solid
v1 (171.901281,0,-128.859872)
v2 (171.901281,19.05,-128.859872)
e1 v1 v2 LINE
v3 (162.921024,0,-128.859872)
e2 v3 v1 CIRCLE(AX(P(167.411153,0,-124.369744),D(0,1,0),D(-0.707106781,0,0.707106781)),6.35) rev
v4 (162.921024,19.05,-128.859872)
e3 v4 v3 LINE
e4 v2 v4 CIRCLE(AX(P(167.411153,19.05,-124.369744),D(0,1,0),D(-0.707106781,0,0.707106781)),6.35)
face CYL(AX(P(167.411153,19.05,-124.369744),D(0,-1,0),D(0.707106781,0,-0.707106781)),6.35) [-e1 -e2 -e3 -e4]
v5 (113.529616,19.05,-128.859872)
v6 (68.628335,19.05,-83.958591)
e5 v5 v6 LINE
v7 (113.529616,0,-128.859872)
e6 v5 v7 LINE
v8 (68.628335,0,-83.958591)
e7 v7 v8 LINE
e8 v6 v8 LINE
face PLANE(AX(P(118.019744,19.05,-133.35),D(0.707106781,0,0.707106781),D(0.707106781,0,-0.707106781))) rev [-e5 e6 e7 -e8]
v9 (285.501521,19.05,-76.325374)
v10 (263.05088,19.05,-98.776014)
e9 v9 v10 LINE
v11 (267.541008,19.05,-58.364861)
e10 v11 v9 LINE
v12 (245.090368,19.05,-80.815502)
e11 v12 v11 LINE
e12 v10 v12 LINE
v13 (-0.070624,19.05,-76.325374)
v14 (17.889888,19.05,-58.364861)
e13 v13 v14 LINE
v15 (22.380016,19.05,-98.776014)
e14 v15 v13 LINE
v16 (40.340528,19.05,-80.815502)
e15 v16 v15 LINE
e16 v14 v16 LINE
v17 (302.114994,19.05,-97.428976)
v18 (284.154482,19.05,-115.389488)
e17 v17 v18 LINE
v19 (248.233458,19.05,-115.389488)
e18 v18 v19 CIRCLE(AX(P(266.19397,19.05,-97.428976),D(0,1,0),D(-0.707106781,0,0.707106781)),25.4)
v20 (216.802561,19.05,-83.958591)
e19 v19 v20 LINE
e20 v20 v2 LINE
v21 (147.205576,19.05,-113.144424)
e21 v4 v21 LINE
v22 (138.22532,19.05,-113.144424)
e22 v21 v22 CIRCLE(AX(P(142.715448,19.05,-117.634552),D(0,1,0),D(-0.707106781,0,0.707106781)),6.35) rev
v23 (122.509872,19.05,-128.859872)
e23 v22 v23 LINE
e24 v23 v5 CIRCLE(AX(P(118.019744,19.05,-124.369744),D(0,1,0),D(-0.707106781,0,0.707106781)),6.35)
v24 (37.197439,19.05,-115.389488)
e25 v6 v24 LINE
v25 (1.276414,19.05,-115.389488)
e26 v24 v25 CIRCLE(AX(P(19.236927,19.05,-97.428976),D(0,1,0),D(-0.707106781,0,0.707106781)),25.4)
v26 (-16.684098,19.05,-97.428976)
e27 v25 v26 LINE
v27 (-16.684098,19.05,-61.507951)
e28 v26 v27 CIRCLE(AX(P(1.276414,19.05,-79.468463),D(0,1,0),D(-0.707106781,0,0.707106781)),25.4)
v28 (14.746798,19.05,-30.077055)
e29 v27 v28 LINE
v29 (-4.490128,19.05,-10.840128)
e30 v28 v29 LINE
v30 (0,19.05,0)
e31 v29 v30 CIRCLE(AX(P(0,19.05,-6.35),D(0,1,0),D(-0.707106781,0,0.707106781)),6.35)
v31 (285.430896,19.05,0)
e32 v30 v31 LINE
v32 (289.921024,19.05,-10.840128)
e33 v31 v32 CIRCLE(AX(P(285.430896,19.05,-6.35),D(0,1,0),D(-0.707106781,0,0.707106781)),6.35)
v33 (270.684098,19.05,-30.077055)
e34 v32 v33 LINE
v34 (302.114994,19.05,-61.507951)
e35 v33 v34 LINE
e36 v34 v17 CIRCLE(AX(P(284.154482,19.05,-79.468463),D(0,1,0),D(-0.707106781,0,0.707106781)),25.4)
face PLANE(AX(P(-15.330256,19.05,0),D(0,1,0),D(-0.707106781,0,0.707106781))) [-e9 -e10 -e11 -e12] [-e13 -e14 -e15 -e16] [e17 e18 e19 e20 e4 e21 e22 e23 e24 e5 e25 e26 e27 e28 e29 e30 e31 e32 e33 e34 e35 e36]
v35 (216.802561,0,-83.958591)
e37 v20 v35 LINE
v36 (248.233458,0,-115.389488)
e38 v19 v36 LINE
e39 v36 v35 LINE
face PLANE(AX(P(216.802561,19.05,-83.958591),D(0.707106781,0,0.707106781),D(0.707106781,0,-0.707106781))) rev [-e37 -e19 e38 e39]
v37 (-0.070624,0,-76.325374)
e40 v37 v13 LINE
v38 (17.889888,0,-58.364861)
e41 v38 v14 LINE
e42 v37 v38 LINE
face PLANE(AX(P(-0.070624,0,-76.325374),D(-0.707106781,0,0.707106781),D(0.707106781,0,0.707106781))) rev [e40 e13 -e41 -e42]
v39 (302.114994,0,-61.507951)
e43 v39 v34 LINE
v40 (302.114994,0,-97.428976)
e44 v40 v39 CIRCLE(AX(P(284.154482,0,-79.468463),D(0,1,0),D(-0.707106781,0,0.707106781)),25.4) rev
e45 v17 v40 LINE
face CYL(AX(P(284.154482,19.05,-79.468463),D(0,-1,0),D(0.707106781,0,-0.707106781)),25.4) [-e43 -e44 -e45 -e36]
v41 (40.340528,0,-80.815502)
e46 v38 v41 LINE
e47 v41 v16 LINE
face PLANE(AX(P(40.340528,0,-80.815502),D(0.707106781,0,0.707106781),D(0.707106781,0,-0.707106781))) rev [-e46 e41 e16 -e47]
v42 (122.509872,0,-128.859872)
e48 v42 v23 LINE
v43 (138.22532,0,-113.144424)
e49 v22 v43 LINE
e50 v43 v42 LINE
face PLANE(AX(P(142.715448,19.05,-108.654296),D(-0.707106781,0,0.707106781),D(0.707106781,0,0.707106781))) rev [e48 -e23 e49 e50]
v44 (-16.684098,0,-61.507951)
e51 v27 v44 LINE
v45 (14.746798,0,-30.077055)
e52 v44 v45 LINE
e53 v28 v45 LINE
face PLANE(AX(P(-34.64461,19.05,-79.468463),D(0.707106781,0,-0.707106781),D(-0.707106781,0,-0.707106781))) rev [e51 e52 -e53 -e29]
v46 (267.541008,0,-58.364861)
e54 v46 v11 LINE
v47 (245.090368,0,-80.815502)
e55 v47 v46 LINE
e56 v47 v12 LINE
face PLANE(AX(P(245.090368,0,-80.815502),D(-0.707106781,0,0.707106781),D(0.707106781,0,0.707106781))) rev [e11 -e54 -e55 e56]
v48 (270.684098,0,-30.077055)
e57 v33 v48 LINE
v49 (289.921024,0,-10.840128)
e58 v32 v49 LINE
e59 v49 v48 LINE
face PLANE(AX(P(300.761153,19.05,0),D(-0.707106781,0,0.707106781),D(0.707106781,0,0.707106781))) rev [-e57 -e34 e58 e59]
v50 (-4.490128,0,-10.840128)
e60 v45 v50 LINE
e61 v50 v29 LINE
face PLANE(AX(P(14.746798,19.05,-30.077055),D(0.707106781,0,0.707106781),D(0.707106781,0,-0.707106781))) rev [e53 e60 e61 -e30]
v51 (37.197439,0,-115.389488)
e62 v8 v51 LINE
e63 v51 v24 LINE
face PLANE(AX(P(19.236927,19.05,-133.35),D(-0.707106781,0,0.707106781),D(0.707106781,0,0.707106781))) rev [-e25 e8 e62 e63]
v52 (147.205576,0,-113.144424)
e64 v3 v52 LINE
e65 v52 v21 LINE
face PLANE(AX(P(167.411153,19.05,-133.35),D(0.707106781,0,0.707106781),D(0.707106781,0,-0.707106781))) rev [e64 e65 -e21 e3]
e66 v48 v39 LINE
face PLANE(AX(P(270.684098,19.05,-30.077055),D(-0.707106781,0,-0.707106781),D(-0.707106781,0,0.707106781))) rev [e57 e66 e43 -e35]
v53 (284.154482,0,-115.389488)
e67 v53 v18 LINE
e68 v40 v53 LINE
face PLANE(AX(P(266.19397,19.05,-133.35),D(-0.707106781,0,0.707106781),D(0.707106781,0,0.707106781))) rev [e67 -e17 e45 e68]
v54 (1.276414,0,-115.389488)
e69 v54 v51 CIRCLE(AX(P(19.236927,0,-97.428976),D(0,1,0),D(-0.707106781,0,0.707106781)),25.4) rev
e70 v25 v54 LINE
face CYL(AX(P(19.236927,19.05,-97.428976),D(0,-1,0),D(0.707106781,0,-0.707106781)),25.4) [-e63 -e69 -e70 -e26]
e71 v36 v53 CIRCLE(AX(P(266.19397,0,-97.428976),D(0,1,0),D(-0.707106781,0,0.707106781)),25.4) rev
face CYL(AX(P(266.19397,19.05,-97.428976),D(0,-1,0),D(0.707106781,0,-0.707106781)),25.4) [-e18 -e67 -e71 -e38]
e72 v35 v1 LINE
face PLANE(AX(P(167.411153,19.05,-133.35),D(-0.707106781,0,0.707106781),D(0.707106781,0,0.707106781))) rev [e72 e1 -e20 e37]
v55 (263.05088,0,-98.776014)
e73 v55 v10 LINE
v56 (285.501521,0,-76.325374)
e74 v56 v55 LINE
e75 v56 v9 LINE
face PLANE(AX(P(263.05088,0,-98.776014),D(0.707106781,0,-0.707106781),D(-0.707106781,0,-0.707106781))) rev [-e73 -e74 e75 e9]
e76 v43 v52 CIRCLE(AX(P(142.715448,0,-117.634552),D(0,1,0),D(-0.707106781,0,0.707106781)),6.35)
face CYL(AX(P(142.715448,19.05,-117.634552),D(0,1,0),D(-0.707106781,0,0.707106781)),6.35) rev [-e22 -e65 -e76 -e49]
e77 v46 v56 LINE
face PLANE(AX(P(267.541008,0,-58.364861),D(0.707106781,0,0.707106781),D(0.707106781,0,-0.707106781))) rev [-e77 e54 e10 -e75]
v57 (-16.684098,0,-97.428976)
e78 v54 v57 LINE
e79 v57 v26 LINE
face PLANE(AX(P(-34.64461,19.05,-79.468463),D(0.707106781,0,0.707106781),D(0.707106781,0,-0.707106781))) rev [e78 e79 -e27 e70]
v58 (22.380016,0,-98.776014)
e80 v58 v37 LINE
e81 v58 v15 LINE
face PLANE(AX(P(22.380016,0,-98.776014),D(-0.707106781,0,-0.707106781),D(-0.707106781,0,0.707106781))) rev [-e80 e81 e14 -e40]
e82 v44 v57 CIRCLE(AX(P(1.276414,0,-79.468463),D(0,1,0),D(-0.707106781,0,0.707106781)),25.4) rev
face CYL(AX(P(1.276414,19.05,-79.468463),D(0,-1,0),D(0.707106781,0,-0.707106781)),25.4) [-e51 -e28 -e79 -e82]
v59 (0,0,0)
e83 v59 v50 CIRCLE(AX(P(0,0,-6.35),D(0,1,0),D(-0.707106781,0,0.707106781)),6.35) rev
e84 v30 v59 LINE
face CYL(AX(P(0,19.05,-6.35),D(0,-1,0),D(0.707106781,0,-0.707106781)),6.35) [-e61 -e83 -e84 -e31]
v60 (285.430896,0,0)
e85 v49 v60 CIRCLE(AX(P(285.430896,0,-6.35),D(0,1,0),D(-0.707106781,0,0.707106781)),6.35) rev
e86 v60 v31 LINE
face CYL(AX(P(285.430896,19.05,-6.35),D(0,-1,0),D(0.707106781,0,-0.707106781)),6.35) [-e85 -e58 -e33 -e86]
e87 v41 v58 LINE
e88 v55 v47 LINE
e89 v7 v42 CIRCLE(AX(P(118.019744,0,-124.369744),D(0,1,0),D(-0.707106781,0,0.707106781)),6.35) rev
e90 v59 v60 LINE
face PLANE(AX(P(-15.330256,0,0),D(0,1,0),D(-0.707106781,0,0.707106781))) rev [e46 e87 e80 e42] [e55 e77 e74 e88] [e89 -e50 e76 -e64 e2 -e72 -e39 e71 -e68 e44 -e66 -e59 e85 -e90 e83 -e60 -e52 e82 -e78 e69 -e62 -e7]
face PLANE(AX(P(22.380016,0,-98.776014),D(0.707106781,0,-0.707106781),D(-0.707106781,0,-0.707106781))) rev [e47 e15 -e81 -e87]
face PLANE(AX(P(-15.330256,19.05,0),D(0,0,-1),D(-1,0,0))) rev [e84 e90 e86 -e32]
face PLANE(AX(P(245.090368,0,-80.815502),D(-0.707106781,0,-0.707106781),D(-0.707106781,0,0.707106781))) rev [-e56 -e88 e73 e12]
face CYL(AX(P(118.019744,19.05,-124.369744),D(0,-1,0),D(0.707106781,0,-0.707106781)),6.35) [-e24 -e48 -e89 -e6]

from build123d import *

# Parameters (mm, degrees)
BOSS_EXTRUDE1_DEPTH       = 19.05
SKETCH2_W                 = 25.4
SKETCH2_H                 = 31.75
SKETCH2_W_2               = 31.75
SKETCH2_H_2               = 25.4
CUT_EXTRUDE1_DEPTH        = 19.05
FILLET1_R                 = 25.4
FILLET2_R                 = 6.35
BODY_MOVE_COPY1_OUTLINE_W = 31.75
BODY_MOVE_COPY1_OUTLINE_H = 25.4
BODY_MOVE_COPY1_DEPTH     = 19.05
BODY_MOVE_COPY1_2_DEPTH   = 19.05


# Read off the part's stored shape, not the designer's step: Body-Move/Copy1
with BuildPart() as part:
    # Sketch1 → Boss-Extrude1 (new body)
    with BuildSketch(Plane(origin=(0, 0, 0), x_dir=(1, 0, 0), z_dir=(0, 1, 0))):
        Polygon((104.775, 223.510378542), (104.775, 293.360378542), (180.975, 293.360378542), (180.975, 223.510378542), (223.510378542, 223.510378542), (0, 0), (0, 42.535378542), (-69.85, 42.535378542), (-69.85, 118.735378542), (0, 118.735378542), (0, 188.585378542), (34.925, 188.585378542), (34.925, 223.510378542), align=None)
    extrude(amount=BOSS_EXTRUDE1_DEPTH)

    # Sketch2 → Cut-Extrude1 (cut)
    with BuildSketch(Plane(origin=(0, 19.05, 0), x_dir=(1, 0, 0), z_dir=(0, 1, 0))):
        with Locations((-30.48, 80.635378542)):
            Rectangle(SKETCH2_W, SKETCH2_H)
        with Locations((142.875, 253.990378542)):
            Rectangle(SKETCH2_W_2, SKETCH2_H_2)
    extrude(amount=-CUT_EXTRUDE1_DEPTH, mode=Mode.SUBTRACT)

    # Fillet1
    fillet1_edges = [part.edges().sort_by_distance(p)[0] for p in [
        (104.775, 9.525, -293.360378542),
        (180.975, 9.525, -293.360378542),
        (-69.85, 9.525, -42.535378542),
        (-69.85, 9.525, -118.735378542),
    ]]
    fillet(fillet1_edges, radius=FILLET1_R)

    # Fillet2
    fillet2_edges = [part.edges().sort_by_distance(p)[0] for p in [
        (223.510378542, 9.525, -223.510378542),
        (0, 9.525, 0),
        (0, 9.525, -188.585378542),
        (34.925, 9.525, -188.585378542),
        (34.925, 9.525, -223.510378542),
    ]]
    fillet(fillet2_edges, radius=FILLET2_R)

    # Body-Move/Copy1 outline → Body-Move/Copy1 (cut)
    # profile 1 of 2: a face of its own
    with BuildSketch(Plane(origin=(0, 0, 0), x_dir=(1, 0, 0), z_dir=(0, 1, 0))):
        with BuildLine():
            Line((122.509871939, 128.859871939), (125.684871939, 125.684871939))
            Line((125.684871939, 125.684871939), (212.670250482, 212.670250482))
            ThreePointArc((212.670250482, 212.670250482), (214.046757453, 219.590418338), (208.180122421, 223.510378542))
            Line((208.180122421, 223.510378542), (180.975, 223.510378542))
            Line((180.975, 223.510378542), (180.975, 267.960378542))
            ThreePointArc((180.975, 267.960378542), (173.535512243, 285.920890784), (155.575, 293.360378542))
            Line((155.575, 293.360378542), (130.175, 293.360378542))
            ThreePointArc((130.175, 293.360378542), (112.214487758, 285.920890784), (104.775, 267.960378542))
            Line((104.775, 267.960378542), (104.775, 223.510378542))
            Line((104.775, 223.510378542), (41.275, 223.510378542))
            ThreePointArc((41.275, 223.510378542), (36.784871939, 221.650506603), (34.925, 217.160378542))
            Line((34.925, 217.160378542), (34.925, 194.935378542))
            ThreePointArc((34.925, 194.935378542), (33.06512806, 190.445250481), (28.575, 188.585378542))
            Line((28.575, 188.585378542), (6.35, 188.585378542))
            ThreePointArc((6.35, 188.585378542), (1.859871939, 186.725506603), (0, 182.235378542))
            Line((0, 182.235378542), (0, 118.735378542))
            Line((0, 118.735378542), (-44.45, 118.735378542))
            ThreePointArc((-44.45, 118.735378542), (-62.410512242, 111.295890785), (-69.85, 93.335378542))
            Line((-69.85, 93.335378542), (-69.85, 67.935378542))
            ThreePointArc((-69.85, 67.935378542), (-62.410512242, 49.9748663), (-44.45, 42.535378542))
            Line((-44.45, 42.535378542), (0, 42.535378542))
            Line((0, 42.535378542), (0, 15.330256121))
            Line((0, 15.330256121), (14.746798487, 30.077054608))
            Line((14.746798487, 30.077054608), (-16.684097937, 61.507951031))
            ThreePointArc((-16.684097937, 61.507951031), (-18.126244186, 63.076488301), (-19.431850797, 64.760378542))
            Line((-19.431850797, 64.760378542), (-43.18, 64.760378542))
            Line((-43.18, 64.760378542), (-43.18, 96.510378542))
            Line((-43.18, 96.510378542), (-17.78, 96.510378542))
            Line((-17.78, 96.510378542), (-17.78, 96.261708161))
            ThreePointArc((-17.78, 96.261708161), (-17.241248642, 96.853979055), (-16.684097937, 97.428975516))
            Line((-16.684097937, 97.428975516), (1.276414305, 115.389487758))
            ThreePointArc((1.276414305, 115.389487758), (19.236926547, 122.828975516), (37.197438789, 115.389487758))
            Line((37.197438789, 115.389487758), (68.628335213, 83.958591334))
            Line((68.628335213, 83.958591334), (113.529615818, 128.859871939))
            ThreePointArc((113.529615818, 128.859871939), (118.019743879, 130.719743879), (122.509871939, 128.859871939))
        make_face()
        with Locations((142.875, 253.990378542)):
            Rectangle(BODY_MOVE_COPY1_OUTLINE_W, BODY_MOVE_COPY1_OUTLINE_H, mode=Mode.SUBTRACT)
    # profile 2 of 2: a face of its own
    with BuildSketch(Plane(origin=(0, 0, 0), x_dir=(1, 0, 0), z_dir=(0, 1, 0))):
        Polygon((40.340528432, 80.815501692), (22.38001619, 98.776013934), (-0.070624113, 76.325373631), (17.889888129, 58.364861389), align=None)
    extrude(amount=BODY_MOVE_COPY1_DEPTH, mode=Mode.SUBTRACT)

    # Body-Move_Copy1 2 outline → Body-Move_Copy1 2 (add)
    # profile 1 of 2: a face of its own
    with BuildSketch(Plane(origin=(0, 0, 0), x_dir=(1, 0, 0), z_dir=(0, 1, 0))):
        with BuildLine():
            Line((216.802561211, 83.958591334), (171.901280605, 128.859871939))
            ThreePointArc((171.901280605, 128.859871939), (167.411152544, 130.719743879), (162.921024484, 128.859871939))
            Line((162.921024484, 128.859871939), (147.205576272, 113.144423728))
            ThreePointArc((147.205576272, 113.144423728), (142.715448211, 111.284551788), (138.225320151, 113.144423728))
            Line((138.225320151, 113.144423728), (125.684871939, 125.684871939))
            Line((125.684871939, 125.684871939), (10.840128061, 10.840128061))
            ThreePointArc((10.840128061, 10.840128061), (3.919960205, 9.46362109), (0, 15.330256121))
            Line((0, 15.330256121), (-4.490128061, 10.840128061))
            ThreePointArc((-4.490128061, 10.840128061), (-5.866635031, 3.919960205), (0, 0))
            Line((0, 0), (285.430896424, 0))
            ThreePointArc((285.430896424, 0), (291.297531455, 3.919960205), (289.921024484, 10.840128061))
            Line((289.921024484, 10.840128061), (270.684097937, 30.077054608))
            Line((270.684097937, 30.077054608), (302.114994361, 61.507951031))
            ThreePointArc((302.114994361, 61.507951031), (309.554482119, 79.468463273), (302.114994361, 97.428975516))
            Line((302.114994361, 97.428975516), (284.154482119, 115.389487758))
            ThreePointArc((284.154482119, 115.389487758), (266.193969876, 122.828975516), (248.233457634, 115.389487758))
            Line((248.233457634, 115.389487758), (216.802561211, 83.958591334))
        make_face()
        Polygon((245.090367992, 80.815501692), (263.050880234, 98.776013934), (285.501520537, 76.325373631), (267.541008295, 58.364861389), align=None, mode=Mode.SUBTRACT)
    # profile 2 of 2: a face of its own
    with BuildSketch(Plane(origin=(0, 0, 0), x_dir=(1, 0, 0), z_dir=(0, 1, 0))):
        with BuildLine():
            ThreePointArc((-17.78, 96.261708161), (-24.088736474, 80.798548227), (-19.431850797, 64.760378542))
            Line((-19.431850797, 64.760378542), (-17.78, 64.760378542))
            Line((-17.78, 64.760378542), (-17.78, 96.261708161))
        make_face()
    extrude(amount=BODY_MOVE_COPY1_2_DEPTH)


solid = part.part
